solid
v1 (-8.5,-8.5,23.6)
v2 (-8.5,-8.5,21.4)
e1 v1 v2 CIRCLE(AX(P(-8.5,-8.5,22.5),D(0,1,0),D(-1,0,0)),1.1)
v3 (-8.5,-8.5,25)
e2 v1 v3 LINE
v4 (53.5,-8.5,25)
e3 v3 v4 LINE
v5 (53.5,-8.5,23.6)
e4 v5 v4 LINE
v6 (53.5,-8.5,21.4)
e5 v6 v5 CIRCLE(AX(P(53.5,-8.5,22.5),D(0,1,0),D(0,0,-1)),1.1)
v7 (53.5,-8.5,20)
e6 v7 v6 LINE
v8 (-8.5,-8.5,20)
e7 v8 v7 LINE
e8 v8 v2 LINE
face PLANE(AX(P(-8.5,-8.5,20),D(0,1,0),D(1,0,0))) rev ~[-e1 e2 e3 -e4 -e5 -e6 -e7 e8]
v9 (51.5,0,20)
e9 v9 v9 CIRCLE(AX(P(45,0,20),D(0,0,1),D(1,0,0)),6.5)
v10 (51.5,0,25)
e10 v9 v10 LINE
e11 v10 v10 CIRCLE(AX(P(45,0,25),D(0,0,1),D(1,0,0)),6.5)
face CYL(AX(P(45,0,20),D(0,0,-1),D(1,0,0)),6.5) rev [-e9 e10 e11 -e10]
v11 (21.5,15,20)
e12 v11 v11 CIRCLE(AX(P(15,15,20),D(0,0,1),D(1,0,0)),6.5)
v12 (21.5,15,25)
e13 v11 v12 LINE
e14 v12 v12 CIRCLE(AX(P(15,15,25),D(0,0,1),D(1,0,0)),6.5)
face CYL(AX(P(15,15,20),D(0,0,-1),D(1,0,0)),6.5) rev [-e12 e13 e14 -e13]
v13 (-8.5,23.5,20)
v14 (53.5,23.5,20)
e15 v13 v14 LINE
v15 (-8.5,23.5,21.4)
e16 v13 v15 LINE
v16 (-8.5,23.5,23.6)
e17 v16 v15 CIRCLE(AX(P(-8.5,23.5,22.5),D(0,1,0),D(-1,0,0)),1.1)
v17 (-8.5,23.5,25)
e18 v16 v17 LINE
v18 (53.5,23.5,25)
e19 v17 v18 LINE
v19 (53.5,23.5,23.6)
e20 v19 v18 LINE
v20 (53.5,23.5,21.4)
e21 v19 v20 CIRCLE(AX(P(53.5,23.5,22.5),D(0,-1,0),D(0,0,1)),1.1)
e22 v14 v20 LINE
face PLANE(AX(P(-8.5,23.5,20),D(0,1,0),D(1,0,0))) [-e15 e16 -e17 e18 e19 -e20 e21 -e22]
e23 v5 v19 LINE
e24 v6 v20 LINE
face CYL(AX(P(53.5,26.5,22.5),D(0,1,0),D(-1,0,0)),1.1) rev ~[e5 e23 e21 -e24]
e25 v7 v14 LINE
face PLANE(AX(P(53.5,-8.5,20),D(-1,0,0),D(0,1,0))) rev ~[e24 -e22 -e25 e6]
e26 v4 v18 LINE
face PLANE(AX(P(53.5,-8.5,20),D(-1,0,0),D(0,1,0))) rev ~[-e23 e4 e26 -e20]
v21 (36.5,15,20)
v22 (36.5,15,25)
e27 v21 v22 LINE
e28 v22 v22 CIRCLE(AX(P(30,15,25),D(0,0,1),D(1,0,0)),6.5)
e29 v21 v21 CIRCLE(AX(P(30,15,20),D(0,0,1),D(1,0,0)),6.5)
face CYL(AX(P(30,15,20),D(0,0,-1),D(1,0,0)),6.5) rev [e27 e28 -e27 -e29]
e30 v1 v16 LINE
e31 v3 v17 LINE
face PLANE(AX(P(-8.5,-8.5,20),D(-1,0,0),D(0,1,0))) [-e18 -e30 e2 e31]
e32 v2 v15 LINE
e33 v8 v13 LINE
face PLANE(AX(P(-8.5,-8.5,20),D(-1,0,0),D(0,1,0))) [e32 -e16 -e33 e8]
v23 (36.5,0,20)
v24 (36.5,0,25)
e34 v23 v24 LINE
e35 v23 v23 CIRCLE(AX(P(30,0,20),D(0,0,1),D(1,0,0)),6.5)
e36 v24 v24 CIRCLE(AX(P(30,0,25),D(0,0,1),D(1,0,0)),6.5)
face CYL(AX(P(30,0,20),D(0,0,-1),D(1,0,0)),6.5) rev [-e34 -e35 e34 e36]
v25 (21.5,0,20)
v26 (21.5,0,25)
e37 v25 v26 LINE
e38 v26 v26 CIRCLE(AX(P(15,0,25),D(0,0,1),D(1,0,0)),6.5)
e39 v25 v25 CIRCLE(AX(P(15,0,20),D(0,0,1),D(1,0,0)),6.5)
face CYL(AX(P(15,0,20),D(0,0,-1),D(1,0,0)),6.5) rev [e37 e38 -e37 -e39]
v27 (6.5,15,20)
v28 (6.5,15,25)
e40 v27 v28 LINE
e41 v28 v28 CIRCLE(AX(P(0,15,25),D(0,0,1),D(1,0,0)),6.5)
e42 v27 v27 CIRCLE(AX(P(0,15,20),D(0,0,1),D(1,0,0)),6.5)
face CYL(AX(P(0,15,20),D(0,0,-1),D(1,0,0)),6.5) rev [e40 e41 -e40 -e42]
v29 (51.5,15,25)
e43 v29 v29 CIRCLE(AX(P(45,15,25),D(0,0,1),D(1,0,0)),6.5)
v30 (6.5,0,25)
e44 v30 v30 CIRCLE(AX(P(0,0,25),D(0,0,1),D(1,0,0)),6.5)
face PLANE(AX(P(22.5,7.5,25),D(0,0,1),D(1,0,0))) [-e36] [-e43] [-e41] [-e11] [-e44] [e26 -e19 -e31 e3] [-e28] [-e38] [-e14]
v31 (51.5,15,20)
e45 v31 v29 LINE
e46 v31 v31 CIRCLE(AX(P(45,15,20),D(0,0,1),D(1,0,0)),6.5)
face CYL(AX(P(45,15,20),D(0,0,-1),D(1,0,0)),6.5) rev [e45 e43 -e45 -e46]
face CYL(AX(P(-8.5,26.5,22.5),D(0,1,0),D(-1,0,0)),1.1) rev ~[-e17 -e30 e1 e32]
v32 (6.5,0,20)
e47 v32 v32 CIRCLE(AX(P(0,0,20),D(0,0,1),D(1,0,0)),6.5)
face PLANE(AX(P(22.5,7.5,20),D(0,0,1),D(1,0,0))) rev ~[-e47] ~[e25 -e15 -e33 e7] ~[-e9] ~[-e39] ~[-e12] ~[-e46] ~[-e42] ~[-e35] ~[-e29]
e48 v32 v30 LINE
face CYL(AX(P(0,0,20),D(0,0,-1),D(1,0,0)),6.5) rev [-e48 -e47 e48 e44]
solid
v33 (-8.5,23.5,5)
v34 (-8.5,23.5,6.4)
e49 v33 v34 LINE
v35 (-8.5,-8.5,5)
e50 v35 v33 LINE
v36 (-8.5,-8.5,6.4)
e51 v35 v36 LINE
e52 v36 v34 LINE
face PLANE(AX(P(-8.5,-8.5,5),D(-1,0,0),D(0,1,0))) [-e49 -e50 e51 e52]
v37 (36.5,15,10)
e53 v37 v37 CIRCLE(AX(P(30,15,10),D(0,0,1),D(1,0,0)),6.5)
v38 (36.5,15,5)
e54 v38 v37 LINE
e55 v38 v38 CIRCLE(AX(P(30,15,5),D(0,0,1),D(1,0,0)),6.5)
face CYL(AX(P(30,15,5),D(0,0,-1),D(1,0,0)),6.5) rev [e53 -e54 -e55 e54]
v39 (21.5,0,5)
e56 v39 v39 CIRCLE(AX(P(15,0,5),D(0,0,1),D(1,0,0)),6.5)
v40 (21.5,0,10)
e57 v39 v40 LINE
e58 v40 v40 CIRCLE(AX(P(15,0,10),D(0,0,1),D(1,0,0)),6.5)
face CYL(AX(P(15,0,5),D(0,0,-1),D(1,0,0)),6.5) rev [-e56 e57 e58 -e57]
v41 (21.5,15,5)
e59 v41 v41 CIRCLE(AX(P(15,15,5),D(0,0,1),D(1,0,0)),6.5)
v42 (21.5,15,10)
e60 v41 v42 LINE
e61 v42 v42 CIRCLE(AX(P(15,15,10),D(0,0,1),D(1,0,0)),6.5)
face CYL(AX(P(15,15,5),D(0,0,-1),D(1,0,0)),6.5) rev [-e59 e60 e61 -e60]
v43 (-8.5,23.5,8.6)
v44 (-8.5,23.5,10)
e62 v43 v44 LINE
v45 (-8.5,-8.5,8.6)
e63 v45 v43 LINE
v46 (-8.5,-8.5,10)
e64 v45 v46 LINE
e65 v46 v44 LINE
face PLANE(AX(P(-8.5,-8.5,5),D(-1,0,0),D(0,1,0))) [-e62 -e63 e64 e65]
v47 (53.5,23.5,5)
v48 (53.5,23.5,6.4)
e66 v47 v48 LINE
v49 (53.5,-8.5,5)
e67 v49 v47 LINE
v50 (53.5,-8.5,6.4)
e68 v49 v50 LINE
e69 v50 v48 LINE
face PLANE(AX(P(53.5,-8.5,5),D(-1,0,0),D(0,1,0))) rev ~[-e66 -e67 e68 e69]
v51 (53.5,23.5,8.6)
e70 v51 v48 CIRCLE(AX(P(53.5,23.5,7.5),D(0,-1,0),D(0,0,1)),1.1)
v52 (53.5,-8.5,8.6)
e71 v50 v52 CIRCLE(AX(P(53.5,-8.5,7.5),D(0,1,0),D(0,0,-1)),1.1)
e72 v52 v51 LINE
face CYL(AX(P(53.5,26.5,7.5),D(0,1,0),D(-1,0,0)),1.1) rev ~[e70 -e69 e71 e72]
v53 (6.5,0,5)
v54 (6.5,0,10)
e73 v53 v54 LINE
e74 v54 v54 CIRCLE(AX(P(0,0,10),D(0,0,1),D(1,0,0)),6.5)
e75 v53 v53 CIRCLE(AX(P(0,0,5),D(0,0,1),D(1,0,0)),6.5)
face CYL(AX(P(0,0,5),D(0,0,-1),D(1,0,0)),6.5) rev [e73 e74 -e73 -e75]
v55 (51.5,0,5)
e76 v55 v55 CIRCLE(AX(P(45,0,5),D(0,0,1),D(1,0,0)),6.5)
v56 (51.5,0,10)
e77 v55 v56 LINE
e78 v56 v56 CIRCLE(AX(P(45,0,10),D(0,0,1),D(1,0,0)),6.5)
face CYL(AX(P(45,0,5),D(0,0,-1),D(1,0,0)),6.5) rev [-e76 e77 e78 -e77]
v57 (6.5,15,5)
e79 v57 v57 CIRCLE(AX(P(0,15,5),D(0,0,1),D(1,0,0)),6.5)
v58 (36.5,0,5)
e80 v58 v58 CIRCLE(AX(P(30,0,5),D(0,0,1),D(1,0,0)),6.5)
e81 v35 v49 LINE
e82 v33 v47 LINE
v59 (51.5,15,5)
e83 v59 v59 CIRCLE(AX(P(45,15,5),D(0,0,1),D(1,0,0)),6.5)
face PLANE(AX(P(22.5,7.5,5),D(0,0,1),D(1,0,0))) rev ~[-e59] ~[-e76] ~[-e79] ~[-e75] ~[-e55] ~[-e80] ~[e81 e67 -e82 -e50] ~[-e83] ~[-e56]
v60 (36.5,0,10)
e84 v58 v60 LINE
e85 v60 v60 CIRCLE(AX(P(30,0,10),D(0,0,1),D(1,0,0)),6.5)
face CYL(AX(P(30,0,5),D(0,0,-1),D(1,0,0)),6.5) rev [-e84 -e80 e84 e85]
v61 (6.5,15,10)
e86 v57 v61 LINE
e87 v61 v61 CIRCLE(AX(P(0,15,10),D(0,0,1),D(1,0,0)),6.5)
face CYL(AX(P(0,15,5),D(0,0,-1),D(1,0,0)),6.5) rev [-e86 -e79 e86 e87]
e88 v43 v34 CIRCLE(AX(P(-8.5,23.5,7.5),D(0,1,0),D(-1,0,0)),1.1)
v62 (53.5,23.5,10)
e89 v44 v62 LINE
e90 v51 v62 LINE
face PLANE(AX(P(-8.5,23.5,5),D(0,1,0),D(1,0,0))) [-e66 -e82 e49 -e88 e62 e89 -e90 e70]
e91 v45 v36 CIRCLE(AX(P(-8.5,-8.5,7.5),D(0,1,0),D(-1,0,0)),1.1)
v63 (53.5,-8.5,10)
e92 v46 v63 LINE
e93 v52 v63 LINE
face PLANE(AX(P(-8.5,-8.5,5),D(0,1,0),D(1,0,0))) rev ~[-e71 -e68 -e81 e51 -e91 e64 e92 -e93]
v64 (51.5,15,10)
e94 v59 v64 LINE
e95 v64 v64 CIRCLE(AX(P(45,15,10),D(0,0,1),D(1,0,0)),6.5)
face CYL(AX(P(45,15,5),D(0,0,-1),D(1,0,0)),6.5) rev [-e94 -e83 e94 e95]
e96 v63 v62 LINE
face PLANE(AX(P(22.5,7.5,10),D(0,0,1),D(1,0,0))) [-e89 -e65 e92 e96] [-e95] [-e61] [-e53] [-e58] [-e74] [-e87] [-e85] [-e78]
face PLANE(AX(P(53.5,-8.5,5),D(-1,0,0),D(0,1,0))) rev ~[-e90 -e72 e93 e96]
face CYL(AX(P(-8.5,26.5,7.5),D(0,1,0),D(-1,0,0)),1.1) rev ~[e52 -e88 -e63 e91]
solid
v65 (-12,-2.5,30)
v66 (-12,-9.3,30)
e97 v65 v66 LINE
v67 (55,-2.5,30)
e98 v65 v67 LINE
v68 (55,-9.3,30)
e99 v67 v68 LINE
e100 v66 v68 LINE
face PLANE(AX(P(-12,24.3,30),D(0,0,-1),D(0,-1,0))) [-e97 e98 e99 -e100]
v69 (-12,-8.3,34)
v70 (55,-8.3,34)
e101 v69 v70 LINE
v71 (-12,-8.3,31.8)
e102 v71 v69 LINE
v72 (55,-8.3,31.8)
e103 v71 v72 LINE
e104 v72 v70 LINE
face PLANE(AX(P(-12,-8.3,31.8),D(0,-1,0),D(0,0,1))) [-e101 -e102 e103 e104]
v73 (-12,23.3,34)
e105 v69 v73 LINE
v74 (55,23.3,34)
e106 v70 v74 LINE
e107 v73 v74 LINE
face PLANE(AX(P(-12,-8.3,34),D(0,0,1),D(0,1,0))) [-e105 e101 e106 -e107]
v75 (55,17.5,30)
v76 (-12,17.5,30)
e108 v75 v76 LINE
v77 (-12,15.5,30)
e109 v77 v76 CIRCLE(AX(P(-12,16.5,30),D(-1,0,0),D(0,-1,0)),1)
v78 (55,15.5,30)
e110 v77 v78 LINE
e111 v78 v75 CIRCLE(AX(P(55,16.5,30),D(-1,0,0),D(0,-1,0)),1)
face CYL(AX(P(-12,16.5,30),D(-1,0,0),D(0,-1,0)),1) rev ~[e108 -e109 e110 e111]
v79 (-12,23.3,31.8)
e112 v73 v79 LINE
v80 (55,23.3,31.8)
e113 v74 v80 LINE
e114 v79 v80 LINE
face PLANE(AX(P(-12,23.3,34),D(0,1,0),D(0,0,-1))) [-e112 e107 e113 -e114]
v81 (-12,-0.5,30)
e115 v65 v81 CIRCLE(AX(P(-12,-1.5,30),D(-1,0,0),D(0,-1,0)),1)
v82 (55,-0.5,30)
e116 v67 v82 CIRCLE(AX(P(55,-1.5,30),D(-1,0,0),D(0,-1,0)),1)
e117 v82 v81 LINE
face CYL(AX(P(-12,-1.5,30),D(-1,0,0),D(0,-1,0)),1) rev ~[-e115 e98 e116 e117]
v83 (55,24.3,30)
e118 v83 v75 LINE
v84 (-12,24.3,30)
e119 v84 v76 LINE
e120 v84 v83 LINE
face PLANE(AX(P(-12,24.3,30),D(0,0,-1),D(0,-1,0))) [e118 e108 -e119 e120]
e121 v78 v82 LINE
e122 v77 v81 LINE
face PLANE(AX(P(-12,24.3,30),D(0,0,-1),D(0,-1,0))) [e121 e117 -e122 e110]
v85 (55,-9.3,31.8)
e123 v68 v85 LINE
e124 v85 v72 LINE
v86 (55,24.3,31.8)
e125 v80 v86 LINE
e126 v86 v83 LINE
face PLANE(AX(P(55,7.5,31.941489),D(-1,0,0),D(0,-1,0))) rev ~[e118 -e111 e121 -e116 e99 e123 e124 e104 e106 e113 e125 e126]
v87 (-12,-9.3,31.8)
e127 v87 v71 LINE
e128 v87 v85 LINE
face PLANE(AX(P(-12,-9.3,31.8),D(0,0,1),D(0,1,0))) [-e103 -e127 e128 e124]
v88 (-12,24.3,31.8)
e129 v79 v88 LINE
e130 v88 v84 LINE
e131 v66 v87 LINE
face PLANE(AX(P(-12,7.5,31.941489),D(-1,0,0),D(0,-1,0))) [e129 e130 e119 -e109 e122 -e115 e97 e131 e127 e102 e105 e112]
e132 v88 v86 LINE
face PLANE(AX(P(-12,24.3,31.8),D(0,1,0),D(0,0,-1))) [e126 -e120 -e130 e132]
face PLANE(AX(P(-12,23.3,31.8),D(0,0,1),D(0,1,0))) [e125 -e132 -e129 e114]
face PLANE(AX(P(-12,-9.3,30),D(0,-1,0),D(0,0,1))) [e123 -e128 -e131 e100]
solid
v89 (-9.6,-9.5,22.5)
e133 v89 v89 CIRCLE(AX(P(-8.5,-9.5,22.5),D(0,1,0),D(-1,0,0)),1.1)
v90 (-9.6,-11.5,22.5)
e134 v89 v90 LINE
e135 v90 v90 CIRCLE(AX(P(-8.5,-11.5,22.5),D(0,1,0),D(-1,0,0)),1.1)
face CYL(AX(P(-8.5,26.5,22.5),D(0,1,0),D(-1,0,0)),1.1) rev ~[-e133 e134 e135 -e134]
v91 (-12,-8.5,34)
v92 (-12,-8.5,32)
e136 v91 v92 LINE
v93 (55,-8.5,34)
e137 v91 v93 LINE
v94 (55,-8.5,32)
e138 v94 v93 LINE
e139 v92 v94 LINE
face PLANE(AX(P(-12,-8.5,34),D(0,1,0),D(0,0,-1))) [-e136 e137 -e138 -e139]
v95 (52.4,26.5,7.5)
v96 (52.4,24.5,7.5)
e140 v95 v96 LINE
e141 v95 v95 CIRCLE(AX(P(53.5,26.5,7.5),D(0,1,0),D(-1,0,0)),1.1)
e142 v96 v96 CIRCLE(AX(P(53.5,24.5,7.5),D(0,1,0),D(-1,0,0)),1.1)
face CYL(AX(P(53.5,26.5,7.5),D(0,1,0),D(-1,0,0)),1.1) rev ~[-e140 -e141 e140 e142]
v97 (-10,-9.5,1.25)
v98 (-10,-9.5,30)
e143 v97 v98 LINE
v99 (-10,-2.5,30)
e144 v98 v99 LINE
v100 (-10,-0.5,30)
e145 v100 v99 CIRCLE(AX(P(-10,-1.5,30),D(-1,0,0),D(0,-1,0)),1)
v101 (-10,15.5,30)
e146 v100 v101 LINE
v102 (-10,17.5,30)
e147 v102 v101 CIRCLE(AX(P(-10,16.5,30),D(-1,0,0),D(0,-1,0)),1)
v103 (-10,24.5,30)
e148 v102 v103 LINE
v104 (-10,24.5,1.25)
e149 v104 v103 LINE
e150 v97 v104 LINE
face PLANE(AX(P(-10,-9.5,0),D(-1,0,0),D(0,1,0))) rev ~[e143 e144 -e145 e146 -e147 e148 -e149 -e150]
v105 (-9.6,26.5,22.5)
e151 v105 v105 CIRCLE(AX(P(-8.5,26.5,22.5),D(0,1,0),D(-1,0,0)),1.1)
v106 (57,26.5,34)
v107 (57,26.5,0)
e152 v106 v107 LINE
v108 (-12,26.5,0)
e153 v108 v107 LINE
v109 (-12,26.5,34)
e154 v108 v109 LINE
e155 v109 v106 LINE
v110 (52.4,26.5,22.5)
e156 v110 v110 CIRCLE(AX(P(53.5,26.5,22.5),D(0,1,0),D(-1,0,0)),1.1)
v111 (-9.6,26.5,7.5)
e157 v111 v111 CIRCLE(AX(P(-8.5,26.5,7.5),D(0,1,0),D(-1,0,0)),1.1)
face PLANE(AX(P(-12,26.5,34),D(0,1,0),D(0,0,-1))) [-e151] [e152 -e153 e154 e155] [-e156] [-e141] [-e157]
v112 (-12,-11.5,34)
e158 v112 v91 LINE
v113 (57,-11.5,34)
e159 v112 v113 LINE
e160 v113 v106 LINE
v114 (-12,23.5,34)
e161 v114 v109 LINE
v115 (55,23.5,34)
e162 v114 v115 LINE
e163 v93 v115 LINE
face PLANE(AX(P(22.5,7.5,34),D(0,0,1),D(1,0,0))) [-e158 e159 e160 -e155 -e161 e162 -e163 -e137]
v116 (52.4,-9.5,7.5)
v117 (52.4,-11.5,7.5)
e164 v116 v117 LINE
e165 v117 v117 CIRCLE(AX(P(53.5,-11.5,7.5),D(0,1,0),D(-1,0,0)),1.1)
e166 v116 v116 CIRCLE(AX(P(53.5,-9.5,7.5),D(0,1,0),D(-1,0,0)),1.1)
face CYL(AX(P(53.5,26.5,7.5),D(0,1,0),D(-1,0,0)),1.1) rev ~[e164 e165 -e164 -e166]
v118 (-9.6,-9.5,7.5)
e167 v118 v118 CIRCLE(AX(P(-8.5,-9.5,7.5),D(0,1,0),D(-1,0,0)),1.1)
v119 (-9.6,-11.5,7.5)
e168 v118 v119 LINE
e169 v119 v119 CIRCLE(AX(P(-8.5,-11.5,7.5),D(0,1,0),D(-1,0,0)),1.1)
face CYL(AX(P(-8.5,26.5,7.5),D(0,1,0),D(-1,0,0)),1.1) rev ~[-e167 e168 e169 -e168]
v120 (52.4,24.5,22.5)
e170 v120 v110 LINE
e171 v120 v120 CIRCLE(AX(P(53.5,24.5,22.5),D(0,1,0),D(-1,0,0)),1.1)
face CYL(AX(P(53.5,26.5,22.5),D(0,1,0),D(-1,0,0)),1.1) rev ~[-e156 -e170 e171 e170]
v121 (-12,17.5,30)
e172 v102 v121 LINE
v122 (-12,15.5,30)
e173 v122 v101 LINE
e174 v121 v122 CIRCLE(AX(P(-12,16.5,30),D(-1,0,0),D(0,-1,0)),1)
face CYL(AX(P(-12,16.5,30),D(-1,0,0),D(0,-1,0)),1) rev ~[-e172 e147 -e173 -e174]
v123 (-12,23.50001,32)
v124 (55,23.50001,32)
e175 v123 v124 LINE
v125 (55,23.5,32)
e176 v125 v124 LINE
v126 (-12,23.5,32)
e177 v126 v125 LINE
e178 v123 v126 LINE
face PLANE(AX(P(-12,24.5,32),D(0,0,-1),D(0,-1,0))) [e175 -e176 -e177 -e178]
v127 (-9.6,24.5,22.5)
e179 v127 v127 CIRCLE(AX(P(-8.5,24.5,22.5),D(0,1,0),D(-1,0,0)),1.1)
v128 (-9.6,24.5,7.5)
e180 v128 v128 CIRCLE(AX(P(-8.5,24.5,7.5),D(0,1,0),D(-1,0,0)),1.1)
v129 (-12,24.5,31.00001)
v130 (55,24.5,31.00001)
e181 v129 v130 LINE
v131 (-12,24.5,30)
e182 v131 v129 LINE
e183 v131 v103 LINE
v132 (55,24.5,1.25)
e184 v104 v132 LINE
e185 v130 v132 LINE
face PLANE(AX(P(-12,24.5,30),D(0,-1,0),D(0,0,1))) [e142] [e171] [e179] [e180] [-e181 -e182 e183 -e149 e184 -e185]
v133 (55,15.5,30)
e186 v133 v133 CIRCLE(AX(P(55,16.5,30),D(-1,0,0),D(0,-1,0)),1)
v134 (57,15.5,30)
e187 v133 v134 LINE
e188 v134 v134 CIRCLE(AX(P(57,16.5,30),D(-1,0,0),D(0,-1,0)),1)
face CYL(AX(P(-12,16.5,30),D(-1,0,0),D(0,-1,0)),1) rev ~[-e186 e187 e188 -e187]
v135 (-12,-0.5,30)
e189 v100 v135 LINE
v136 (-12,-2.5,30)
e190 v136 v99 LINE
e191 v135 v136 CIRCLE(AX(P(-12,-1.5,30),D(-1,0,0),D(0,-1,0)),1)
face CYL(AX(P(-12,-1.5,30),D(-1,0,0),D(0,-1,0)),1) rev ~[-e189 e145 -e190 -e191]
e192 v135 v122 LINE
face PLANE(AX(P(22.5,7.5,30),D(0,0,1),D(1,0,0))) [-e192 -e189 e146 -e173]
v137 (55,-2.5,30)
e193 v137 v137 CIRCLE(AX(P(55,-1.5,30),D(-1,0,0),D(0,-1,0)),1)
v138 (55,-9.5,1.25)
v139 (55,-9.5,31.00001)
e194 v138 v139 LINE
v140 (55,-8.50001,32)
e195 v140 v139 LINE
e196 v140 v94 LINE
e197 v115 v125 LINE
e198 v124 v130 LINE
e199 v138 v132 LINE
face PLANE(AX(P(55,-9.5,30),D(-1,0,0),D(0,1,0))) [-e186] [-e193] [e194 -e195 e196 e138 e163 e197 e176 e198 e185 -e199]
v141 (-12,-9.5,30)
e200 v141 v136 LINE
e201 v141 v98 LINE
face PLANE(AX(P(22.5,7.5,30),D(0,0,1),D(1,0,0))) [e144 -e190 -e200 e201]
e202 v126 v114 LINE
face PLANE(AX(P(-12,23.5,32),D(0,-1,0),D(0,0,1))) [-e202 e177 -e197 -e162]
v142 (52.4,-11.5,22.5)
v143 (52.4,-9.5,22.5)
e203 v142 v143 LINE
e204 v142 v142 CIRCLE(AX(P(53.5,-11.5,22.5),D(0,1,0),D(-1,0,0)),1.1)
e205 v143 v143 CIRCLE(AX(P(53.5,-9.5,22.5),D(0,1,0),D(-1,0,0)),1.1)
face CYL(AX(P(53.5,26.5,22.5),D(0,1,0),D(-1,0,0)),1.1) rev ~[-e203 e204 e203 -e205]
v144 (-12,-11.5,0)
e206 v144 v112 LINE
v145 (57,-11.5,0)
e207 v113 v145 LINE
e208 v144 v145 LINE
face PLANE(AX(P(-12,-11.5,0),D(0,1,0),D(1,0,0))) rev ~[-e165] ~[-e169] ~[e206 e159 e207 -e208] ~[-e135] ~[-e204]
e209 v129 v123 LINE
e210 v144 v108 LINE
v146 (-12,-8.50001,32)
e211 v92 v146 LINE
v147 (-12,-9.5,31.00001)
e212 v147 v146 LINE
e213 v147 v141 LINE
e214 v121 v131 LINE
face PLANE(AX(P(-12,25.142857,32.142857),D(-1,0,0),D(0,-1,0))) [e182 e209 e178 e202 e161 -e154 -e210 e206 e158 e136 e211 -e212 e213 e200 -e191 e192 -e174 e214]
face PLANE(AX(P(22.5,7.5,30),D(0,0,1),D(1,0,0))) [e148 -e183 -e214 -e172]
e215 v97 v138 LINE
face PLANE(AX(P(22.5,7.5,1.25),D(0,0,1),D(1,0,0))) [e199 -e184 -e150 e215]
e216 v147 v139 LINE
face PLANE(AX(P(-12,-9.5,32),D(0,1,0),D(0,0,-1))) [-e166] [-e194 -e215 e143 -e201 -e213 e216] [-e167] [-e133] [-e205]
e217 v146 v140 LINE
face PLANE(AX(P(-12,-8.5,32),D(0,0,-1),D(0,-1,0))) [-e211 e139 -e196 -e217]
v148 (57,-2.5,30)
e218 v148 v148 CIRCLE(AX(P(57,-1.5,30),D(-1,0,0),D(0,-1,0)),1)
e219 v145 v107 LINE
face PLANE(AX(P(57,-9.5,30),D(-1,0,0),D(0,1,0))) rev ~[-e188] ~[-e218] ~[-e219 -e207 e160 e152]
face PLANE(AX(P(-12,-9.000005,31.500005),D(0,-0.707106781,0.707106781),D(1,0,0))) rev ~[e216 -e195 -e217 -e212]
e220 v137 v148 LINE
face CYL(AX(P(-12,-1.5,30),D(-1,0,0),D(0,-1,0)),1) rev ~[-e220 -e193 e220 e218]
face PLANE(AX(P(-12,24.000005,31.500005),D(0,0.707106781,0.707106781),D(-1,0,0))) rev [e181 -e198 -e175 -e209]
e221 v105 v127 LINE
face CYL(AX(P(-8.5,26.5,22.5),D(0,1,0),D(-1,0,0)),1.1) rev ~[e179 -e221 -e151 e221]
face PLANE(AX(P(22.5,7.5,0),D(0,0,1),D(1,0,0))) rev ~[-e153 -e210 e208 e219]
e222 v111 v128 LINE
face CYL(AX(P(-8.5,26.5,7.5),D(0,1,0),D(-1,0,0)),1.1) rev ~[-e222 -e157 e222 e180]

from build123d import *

# Parameters (mm, degrees)
F0_W      = 69
F0_H      = 38
F0_W_2    = 65
F0_H_2    = 34
F1_DEPTH  = 30
F0_W_3    = 62
F0_H_3    = 32
F0_R      = 6.5
F2_DEPTH  = 1.25
F3_START  = 5
F3_DEPTH  = 5
F5_R      = 1.1
F6_DEPTH  = 50
F8_DEPTH  = 69
F9_SIZE   = 0.99999
F10_DEPTH = 67
F11_DEPTH = 4
F12_R     = 1
F13_DEPTH = 69


# Not quite as in the source:
# - a fillet or chamfer is up to 0.001 mm smaller than in the source, because OpenCascade refuses the exact size


with BuildPart() as f1:
    # F0 (on Top) → F1 (new body)
    with BuildSketch(Plane.XY):
        with Locations((22.5, 7.5)):
            Rectangle(F0_W, F0_H)
        with Locations((22.5, 7.5)):
            Rectangle(F0_W_2, F0_H_2, mode=Mode.SUBTRACT)
    extrude(amount=F1_DEPTH)

    # F0 (on Top) → F2 (join)
    with BuildSketch(Plane.XY):
        with Locations((22.5, 7.5)):
            Rectangle(F0_W_2, F0_H_2)
        with Locations((22.5, 7.5)):
            Rectangle(F0_W_3, F0_H_3, mode=Mode.SUBTRACT)
        with Locations((22.5, 7.5)):
            Rectangle(F0_W_3, F0_H_3)
        Circle(F0_R, mode=Mode.SUBTRACT)
        with Locations((15, 0)):
            Circle(F0_R, mode=Mode.SUBTRACT)
        with Locations((30, 0)):
            Circle(F0_R, mode=Mode.SUBTRACT)
        with Locations((45, 0)):
            Circle(F0_R, mode=Mode.SUBTRACT)
        with Locations((0, 15)):
            Circle(F0_R, mode=Mode.SUBTRACT)
        with Locations((15, 15)):
            Circle(F0_R, mode=Mode.SUBTRACT)
        with Locations((30, 15)):
            Circle(F0_R, mode=Mode.SUBTRACT)
        with Locations((45, 15)):
            Circle(F0_R, mode=Mode.SUBTRACT)
        with Locations((0, 15)):
            Circle(F0_R)
        with Locations((15, 15)):
            Circle(F0_R)
        with Locations((30, 15)):
            Circle(F0_R)
        with Locations((45, 15)):
            Circle(F0_R)
        with Locations((45, 0)):
            Circle(F0_R)
        with Locations((15, 0)):
            Circle(F0_R)
        with Locations((30, 0)):
            Circle(F0_R)
        Circle(F0_R)
    extrude(amount=F2_DEPTH)


with BuildPart() as f3:
    # F0 (on Top) → F3 (new body)
    with BuildSketch(Plane.XY.offset(F3_START)):
        with Locations((22.5, 7.5)):
            Rectangle(F0_W_3, F0_H_3)
        Circle(F0_R, mode=Mode.SUBTRACT)
        with Locations((15, 0)):
            Circle(F0_R, mode=Mode.SUBTRACT)
        with Locations((30, 0)):
            Circle(F0_R, mode=Mode.SUBTRACT)
        with Locations((45, 0)):
            Circle(F0_R, mode=Mode.SUBTRACT)
        with Locations((0, 15)):
            Circle(F0_R, mode=Mode.SUBTRACT)
        with Locations((15, 15)):
            Circle(F0_R, mode=Mode.SUBTRACT)
        with Locations((30, 15)):
            Circle(F0_R, mode=Mode.SUBTRACT)
        with Locations((45, 15)):
            Circle(F0_R, mode=Mode.SUBTRACT)
    extrude(amount=F3_DEPTH)


with BuildPart() as f4_1:
    # F4: copy of F3
    add(f3.part.moved(Location((0, 0, 15))))


with BuildPart() as f6_tool:
    # F5 (on face) → F6 (new body, symmetric)
    with BuildSketch(Plane(origin=(0, 26.5, 0), x_dir=(-1, 0, 0), z_dir=(0, 1, 0))):
        with Locations((8.5, 22.5)):
            Circle(F5_R)
        with Locations((8.5, 7.5)):
            Circle(F5_R)
        with Locations((-53.5, 7.5)):
            Circle(F5_R)
        with Locations((-53.5, 22.5)):
            Circle(F5_R)
    extrude(amount=F6_DEPTH, both=True)


with BuildPart() as f1_1:
    add(f1.part)

    # F6: cut by f6_tool
    add(f6_tool.part, mode=Mode.SUBTRACT)

    # F7 (on face) → F8 (join, through all)
    with BuildSketch(Plane(origin=(-12, 0, 0), x_dir=(0, -1, 0), z_dir=(-1, 0, 0))):
        Polygon((-26.5, 34), (-26.5, 30), (-24.5, 30), (-24.5, 32), (-23.5, 32), (-23.5, 34), align=None)
        Polygon((9.5, 30), (11.5, 30), (11.5, 34), (8.5, 34), (8.5, 32), (9.5, 32), align=None)
    extrude(amount=-F8_DEPTH)

    # F9 (size 1 in the source; OpenCascade refuses exactly that, so slightly less here)
    f9_edges = [f1_1.edges().sort_by_distance(p)[0] for p in [
        (22.5, 24.5, 32),
        (22.5, -9.5, 32),
    ]]
    chamfer(f9_edges, length=F9_SIZE)

    # F11 (add, through all): a face of the model
    f11_faces = [f1_1.faces().sort_by_distance(p)[0] for p in [
        (56, 7.5, 30),
    ]]
    extrude(f11_faces, amount=F11_DEPTH)


with BuildPart() as f3_1:
    add(f3.part)

    # F6: cut by f6_tool
    add(f6_tool.part, mode=Mode.SUBTRACT)


with BuildPart() as f4_1_1:
    add(f4_1.part)

    # F6: cut by f6_tool
    add(f6_tool.part, mode=Mode.SUBTRACT)


with BuildPart() as f10:
    # F7 (on face) → F10 (new body, through all)
    with BuildSketch(Plane(origin=(-12, 0, 0), x_dir=(0, -1, 0), z_dir=(-1, 0, 0))):
        Polygon((-24.3, 31.8), (-24.3, 30), (9.3, 30), (9.3, 31.8), (8.3, 31.8), (8.3, 34), (-23.3, 34), (-23.3, 31.8), align=None)
    extrude(amount=-F10_DEPTH)


with BuildPart() as f13_tool:
    # F12 (on face) → F13 (new body, through all)
    with BuildSketch(Plane(origin=(-12, 0, 0), x_dir=(0, -1, 0), z_dir=(-1, 0, 0))):
        with Locations((-16.5, 30)):
            Circle(F12_R)
        with Locations((1.5, 30)):
            Circle(F12_R)
    extrude(amount=-F13_DEPTH)


with BuildPart() as f1_2:
    add(f1_1.part)

    # F13: cut by f13_tool
    add(f13_tool.part, mode=Mode.SUBTRACT)


with BuildPart() as f10_1:
    add(f10.part)

    # F13: cut by f13_tool
    add(f13_tool.part, mode=Mode.SUBTRACT)


solid = Compound([f3_1.part, f4_1_1.part, f1_2.part, f10_1.part])
